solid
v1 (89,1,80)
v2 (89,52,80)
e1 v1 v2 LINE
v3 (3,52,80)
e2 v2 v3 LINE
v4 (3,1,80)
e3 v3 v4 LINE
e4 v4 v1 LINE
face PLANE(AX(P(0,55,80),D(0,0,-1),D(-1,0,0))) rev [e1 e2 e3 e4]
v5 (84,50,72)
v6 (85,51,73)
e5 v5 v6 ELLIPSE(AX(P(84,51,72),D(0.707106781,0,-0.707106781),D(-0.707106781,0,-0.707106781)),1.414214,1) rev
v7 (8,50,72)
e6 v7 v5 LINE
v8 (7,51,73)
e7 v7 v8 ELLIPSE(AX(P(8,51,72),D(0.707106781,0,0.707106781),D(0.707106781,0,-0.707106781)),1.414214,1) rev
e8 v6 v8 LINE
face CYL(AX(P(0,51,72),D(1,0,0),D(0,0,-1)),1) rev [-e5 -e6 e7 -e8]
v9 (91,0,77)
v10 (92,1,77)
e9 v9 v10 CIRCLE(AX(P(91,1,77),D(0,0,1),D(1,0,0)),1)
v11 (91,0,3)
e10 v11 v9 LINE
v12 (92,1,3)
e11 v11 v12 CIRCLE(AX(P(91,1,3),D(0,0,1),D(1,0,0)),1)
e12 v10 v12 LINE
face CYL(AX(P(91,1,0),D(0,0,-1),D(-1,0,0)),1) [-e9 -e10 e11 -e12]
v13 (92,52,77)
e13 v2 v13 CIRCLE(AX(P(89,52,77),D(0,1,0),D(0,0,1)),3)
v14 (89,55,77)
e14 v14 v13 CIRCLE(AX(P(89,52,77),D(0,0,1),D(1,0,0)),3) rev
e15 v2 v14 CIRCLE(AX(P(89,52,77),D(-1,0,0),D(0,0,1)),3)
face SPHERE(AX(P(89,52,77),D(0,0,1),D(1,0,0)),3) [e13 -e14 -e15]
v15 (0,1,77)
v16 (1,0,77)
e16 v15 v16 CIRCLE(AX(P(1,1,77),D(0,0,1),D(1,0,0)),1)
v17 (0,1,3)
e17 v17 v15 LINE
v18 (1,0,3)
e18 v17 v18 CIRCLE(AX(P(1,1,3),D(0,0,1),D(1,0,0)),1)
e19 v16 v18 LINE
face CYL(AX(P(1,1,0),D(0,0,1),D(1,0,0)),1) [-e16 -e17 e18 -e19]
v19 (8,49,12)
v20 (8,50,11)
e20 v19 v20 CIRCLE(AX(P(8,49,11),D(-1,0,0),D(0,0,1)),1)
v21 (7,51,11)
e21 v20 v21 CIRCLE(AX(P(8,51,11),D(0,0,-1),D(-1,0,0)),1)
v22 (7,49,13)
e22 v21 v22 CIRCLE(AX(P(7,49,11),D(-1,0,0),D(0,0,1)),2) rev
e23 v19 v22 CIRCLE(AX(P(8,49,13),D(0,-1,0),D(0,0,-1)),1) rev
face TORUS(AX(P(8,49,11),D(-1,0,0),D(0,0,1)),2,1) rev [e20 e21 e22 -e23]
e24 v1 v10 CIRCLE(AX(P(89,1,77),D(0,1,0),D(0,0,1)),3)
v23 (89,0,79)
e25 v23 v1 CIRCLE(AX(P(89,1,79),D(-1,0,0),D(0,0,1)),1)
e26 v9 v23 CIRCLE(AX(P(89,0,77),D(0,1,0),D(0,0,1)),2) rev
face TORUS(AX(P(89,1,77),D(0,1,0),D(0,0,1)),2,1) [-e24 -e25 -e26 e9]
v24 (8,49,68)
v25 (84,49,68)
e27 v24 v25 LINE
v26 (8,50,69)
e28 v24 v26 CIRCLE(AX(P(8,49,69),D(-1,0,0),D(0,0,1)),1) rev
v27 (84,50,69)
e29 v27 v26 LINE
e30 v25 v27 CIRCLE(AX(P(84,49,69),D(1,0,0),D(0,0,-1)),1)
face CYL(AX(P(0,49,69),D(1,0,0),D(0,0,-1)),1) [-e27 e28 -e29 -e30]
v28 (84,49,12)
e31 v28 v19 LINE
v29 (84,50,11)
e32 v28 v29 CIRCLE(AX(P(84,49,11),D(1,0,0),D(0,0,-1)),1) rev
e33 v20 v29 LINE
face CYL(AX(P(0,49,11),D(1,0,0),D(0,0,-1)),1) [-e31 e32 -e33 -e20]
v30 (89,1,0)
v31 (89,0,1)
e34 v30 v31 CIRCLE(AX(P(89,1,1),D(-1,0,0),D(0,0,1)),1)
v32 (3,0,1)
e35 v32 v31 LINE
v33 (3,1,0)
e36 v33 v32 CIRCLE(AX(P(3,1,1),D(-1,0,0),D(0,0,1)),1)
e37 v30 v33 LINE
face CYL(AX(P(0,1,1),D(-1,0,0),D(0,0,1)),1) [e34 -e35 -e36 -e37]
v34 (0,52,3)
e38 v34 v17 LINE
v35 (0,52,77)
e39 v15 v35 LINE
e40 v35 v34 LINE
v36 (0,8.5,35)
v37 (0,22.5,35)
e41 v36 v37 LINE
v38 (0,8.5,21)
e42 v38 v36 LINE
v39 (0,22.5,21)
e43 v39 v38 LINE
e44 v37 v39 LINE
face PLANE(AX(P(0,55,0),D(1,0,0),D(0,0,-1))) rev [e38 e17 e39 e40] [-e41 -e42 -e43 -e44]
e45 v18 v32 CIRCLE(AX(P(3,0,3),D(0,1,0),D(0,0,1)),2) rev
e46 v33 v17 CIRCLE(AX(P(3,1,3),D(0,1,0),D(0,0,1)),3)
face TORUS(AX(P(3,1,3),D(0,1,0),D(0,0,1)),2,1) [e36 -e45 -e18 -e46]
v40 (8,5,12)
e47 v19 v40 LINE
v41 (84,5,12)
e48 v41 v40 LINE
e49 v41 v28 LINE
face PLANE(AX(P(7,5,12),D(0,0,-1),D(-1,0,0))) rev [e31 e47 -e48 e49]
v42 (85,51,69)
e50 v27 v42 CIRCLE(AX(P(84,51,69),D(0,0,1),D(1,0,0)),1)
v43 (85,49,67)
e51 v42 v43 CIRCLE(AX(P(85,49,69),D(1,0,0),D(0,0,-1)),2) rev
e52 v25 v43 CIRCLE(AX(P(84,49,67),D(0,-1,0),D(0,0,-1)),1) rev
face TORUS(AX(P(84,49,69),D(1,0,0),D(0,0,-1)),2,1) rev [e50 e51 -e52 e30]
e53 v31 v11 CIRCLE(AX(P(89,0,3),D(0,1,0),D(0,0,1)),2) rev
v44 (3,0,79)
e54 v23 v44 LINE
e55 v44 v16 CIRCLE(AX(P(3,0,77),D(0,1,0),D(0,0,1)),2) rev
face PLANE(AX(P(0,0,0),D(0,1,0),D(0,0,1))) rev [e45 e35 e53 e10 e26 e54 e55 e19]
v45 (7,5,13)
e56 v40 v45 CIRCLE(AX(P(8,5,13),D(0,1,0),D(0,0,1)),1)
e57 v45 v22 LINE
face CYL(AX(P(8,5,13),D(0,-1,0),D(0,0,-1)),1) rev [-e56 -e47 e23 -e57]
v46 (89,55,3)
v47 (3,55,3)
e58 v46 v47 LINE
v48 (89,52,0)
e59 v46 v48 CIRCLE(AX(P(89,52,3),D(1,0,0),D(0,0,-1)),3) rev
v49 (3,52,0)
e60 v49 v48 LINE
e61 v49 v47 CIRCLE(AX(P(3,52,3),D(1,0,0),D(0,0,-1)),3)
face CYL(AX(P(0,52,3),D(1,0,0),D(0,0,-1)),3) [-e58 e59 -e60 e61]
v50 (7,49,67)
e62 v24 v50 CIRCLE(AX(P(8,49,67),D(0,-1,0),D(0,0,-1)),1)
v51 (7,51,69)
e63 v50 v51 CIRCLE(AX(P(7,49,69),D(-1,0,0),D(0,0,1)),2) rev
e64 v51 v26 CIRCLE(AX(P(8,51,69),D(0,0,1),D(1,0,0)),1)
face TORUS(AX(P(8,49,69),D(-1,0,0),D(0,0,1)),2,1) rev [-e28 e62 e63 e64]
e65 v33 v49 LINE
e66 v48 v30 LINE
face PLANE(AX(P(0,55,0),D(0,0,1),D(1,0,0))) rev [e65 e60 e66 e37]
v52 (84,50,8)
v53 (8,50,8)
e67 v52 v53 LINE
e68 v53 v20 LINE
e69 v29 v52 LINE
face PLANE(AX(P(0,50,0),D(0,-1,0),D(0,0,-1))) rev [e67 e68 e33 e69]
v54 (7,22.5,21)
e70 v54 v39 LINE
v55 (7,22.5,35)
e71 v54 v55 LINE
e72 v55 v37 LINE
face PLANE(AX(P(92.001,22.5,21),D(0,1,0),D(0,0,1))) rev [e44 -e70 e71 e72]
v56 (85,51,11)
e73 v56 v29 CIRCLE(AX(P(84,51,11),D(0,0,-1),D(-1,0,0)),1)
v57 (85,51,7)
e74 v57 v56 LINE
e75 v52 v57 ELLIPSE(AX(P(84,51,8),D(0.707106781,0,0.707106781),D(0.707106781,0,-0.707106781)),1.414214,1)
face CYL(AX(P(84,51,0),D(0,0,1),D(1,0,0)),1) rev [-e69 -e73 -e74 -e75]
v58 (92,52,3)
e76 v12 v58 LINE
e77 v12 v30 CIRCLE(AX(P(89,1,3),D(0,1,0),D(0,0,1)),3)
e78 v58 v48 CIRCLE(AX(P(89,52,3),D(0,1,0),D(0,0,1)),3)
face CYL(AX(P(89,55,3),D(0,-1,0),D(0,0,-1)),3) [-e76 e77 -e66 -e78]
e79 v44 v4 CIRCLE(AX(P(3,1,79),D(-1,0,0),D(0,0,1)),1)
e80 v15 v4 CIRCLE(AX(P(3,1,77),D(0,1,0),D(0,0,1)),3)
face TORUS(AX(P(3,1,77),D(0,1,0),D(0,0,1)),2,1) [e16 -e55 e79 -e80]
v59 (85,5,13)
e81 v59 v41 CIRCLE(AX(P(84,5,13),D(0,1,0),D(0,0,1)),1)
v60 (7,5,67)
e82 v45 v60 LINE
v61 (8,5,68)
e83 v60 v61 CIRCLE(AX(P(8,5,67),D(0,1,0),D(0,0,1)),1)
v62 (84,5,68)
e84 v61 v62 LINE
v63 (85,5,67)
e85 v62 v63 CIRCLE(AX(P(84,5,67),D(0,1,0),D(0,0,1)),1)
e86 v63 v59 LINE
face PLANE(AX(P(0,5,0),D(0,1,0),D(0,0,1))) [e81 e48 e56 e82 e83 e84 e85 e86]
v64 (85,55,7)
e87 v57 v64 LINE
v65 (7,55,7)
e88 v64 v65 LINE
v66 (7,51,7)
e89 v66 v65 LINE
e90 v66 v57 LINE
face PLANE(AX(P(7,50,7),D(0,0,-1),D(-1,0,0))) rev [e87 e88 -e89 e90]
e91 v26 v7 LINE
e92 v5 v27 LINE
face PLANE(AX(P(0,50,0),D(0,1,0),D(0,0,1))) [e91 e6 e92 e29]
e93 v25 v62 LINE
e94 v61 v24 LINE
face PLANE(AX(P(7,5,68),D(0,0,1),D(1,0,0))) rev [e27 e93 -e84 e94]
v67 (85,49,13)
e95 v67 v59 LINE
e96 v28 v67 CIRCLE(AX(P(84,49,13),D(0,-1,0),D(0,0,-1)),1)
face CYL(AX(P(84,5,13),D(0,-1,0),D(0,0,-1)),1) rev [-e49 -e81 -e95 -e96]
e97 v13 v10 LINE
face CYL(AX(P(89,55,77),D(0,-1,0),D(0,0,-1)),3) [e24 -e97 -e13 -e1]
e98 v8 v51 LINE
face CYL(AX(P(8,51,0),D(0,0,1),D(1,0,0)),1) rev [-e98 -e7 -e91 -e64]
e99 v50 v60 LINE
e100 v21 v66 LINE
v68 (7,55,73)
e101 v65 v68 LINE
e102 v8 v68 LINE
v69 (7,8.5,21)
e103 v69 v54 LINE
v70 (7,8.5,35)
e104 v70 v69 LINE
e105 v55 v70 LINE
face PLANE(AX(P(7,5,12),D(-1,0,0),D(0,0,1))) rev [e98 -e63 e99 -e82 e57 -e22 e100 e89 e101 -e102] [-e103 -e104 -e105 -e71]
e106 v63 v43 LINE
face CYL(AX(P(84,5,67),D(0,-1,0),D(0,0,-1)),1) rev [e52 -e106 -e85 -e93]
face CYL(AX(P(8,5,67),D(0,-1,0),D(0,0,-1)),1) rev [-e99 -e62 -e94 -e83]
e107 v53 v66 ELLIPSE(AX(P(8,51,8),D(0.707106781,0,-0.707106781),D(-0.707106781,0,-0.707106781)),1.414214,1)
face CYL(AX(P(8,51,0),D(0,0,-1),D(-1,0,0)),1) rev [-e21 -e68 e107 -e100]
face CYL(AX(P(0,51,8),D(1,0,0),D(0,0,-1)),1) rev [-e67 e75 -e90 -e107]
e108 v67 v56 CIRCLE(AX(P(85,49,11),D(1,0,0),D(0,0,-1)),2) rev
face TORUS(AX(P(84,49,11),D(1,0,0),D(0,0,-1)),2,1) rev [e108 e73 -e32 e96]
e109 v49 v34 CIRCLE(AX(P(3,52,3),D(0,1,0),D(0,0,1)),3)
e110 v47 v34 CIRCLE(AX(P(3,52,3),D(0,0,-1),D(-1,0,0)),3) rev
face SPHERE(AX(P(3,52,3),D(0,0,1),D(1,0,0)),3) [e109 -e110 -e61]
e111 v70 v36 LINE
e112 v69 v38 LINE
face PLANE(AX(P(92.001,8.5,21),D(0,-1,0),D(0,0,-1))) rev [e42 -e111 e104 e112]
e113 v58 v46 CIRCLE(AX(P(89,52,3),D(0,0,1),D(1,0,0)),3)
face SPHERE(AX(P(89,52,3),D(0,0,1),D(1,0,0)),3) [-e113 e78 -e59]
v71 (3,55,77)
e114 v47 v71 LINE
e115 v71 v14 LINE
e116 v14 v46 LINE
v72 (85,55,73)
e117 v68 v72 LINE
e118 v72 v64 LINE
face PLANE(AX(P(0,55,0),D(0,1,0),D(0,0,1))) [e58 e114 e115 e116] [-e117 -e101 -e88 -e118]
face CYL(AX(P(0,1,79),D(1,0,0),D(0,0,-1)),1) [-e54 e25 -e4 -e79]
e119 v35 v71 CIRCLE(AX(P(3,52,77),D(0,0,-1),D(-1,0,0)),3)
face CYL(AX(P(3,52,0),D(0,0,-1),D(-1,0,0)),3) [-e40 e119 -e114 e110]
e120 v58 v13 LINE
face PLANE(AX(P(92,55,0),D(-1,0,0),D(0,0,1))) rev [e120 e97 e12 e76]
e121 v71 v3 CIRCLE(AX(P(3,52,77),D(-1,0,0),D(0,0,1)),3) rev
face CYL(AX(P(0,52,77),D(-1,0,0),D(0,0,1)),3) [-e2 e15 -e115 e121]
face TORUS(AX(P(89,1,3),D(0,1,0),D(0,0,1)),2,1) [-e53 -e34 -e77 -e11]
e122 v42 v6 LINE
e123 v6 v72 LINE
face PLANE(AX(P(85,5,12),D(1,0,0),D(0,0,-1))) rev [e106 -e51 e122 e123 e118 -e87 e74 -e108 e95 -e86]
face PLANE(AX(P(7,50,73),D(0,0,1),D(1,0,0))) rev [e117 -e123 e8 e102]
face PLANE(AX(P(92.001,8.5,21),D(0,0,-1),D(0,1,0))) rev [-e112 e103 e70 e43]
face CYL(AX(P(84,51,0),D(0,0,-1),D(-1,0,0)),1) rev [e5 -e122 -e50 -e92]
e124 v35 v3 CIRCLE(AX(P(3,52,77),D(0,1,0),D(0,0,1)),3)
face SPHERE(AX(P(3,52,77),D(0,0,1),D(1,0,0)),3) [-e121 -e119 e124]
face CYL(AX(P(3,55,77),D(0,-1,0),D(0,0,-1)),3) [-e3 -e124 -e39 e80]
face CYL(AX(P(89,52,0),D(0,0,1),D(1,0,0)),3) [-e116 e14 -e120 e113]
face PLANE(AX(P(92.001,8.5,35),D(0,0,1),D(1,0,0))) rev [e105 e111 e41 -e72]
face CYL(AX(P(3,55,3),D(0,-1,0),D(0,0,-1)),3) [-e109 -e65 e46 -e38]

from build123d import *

# Parameters (mm, degrees)
SKETCH1_W           = 92
SKETCH1_H           = 80
BOSS_EXTRUDE1_DEPTH = 55
SKETCH2_W           = 78
SKETCH2_H           = 56
CUT_EXTRUDE1_DEPTH  = 50
SKETCH3_W           = 78
SKETCH3_H           = 5
CUT_EXTRUDE2_DEPTH  = 5
FILLET_TOP_R        = 3
FILLET_EDGES_R      = 3
FILLET_BOTTOM_R     = 1
FILLET4_R           = 1
CUT_EXTRUDE4_REACH  = 135.75
SKETCH5_W           = 14
SKETCH5_H           = 14


with BuildPart() as part:
    # Sketch1 → Boss-Extrude1 (new body)
    with BuildSketch(Plane(origin=(0, 0, 0), x_dir=(1, 0, 0), z_dir=(0, 1, 0))):
        with Locations((46, -40)):
            Rectangle(SKETCH1_W, SKETCH1_H)
    extrude(amount=BOSS_EXTRUDE1_DEPTH)

    # Sketch2 → Cut-Extrude1 (cut)
    with BuildSketch(Plane(origin=(0, 55, 0), x_dir=(1, 0, 0), z_dir=(0, 1, 0))):
        with Locations((46, -40)):
            Rectangle(SKETCH2_W, SKETCH2_H)
    extrude(amount=-CUT_EXTRUDE1_DEPTH, mode=Mode.SUBTRACT)

    # Sketch3 → Cut-Extrude2 (cut)
    with BuildSketch(Plane(origin=(0, 55, 0), x_dir=(1, 0, 0), z_dir=(0, 1, 0))):
        with Locations((46, -9.5)):
            Rectangle(SKETCH3_W, SKETCH3_H)
        with Locations((46, -70.5)):
            Rectangle(SKETCH3_W, SKETCH3_H)
    extrude(amount=-CUT_EXTRUDE2_DEPTH, mode=Mode.SUBTRACT)

    # Fillet_top
    fillet_top_edges = [part.edges().sort_by_distance(p)[0] for p in [
        (92, 55, 40),
        (46, 55, 0),
        (0, 55, 40),
        (46, 55, 80),
    ]]
    fillet(fillet_top_edges, radius=FILLET_TOP_R)

    # Fillet_edges
    # the kernel refuses this fillet: 3 mm, written as the material it takes off along each edge
    with BuildSketch(Plane(origin=(3, 52, 77), x_dir=(0, 0, 1), z_dir=(-1, 0, 0))) as fillet_edges_piece_1_section:
        Polygon((0, 0), (FILLET_EDGES_R, 0), (FILLET_EDGES_R, FILLET_EDGES_R), (0, FILLET_EDGES_R), align=None)
    fillet_edges_piece_1 = extrude(amount=FILLET_EDGES_R, mode=Mode.PRIVATE)
    fillet_edges_piece_1 = fillet_edges_piece_1 - Plane(origin=(3, 52, 77), x_dir=(0, -0.7071067811865475, -0.7071067811865475), z_dir=(-1, 0, 0)) * Sphere(FILLET_EDGES_R, mode=Mode.PRIVATE)
    add(fillet_edges_piece_1, mode=Mode.SUBTRACT)
    with BuildSketch(Plane(origin=(3, 52, 3), x_dir=(-1, 0, 0), z_dir=(0, 0, -1))) as fillet_edges_piece_2_section:
        Polygon((0, 0), (FILLET_EDGES_R, 0), (FILLET_EDGES_R, FILLET_EDGES_R), (0, FILLET_EDGES_R), align=None)
    fillet_edges_piece_2 = extrude(amount=FILLET_EDGES_R, mode=Mode.PRIVATE)
    fillet_edges_piece_2 = fillet_edges_piece_2 - Plane(origin=(3, 52, 3), x_dir=(0.7071067811865475, -0.7071067811865475, 0), z_dir=(0, 0, -1)) * Sphere(FILLET_EDGES_R, mode=Mode.PRIVATE)
    add(fillet_edges_piece_2, mode=Mode.SUBTRACT)
    with BuildSketch(Plane(origin=(89, 52, 77), x_dir=(0, 0, 1), z_dir=(1, 0, 0))) as fillet_edges_piece_3_section:
        Polygon((0, 0), (FILLET_EDGES_R, 0), (FILLET_EDGES_R, -FILLET_EDGES_R), (0, -FILLET_EDGES_R), align=None)
    fillet_edges_piece_3 = extrude(amount=FILLET_EDGES_R, mode=Mode.PRIVATE)
    fillet_edges_piece_3 = fillet_edges_piece_3 - Plane(origin=(89, 52, 77), x_dir=(0, -0.7071067811865475, -0.7071067811865475), z_dir=(1, 0, 0)) * Sphere(FILLET_EDGES_R, mode=Mode.PRIVATE)
    add(fillet_edges_piece_3, mode=Mode.SUBTRACT)
    with BuildSketch(Plane(origin=(89, 52, 3), x_dir=(1, 0, 0), z_dir=(0, 0, -1))) as fillet_edges_piece_4_section:
        Polygon((0, 0), (FILLET_EDGES_R, 0), (FILLET_EDGES_R, -FILLET_EDGES_R), (0, -FILLET_EDGES_R), align=None)
    fillet_edges_piece_4 = extrude(amount=FILLET_EDGES_R, mode=Mode.PRIVATE)
    fillet_edges_piece_4 = fillet_edges_piece_4 - Plane(origin=(89, 52, 3), x_dir=(-0.7071067811865475, -0.7071067811865475, 0), z_dir=(0, 0, -1)) * Sphere(FILLET_EDGES_R, mode=Mode.PRIVATE)
    add(fillet_edges_piece_4, mode=Mode.SUBTRACT)
    with BuildSketch(Plane(origin=(92, -7.5, 0), x_dir=(-1, 0, 0), z_dir=(0, 1, 0)), Plane(origin=(92, -7.5, 80), x_dir=(0, 0, -1), z_dir=(0, 1, 0))) as fillet_edges_piece_5:
        with BuildLine():
            CenterArc((FILLET_EDGES_R, FILLET_EDGES_R), FILLET_EDGES_R, 180, 90)
            Line((0, FILLET_EDGES_R), (0, 0))
            Line((0, 0), (FILLET_EDGES_R, 0))
        make_face()
    extrude(amount=59.5, mode=Mode.SUBTRACT)
    with BuildSketch(Plane(origin=(0, -7.5, 80), x_dir=(0, 0, -1), z_dir=(0, 1, 0)), Plane(origin=(0, -7.5, 0), x_dir=(1, 0, 0), z_dir=(0, 1, 0))) as fillet_edges_piece_6:
        with BuildLine():
            CenterArc((FILLET_EDGES_R, -FILLET_EDGES_R), FILLET_EDGES_R, 90, 90)
            Line((0, -FILLET_EDGES_R), (0, 0))
            Line((0, 0), (FILLET_EDGES_R, 0))
        make_face()
    extrude(amount=59.5, mode=Mode.SUBTRACT)

    # Fillet_bottom
    fillet_bottom_edges = [part.edges().sort_by_distance(p)[0] for p in [
        (0, 0, 40),
        (46, 0, 0),
        (92, 0, 40),
        (46, 0, 80),
        (0.878679656, 0, 79.121320344),
        (91.121320344, 0, 79.121320344),
        (91.121320344, 0, 0.878679656),
        (0.878679656, 0, 0.878679656),
    ]]
    fillet(fillet_bottom_edges, radius=FILLET_BOTTOM_R)

    # Fillet4
    fillet4_edges = [part.edges().sort_by_distance(p)[0] for p in [
        (7, 27.5, 68),
        (7, 27.5, 12),
        (85, 27.5, 12),
        (85, 27.5, 68),
        (46, 50, 12),
        (7, 50, 9.5),
        (46, 50, 7),
        (85, 50, 9.5),
        (46, 50, 68),
        (85, 50, 70.5),
        (46, 50, 73),
        (7, 50, 70.5),
    ]]
    fillet(fillet4_edges, radius=FILLET4_R)

    # Sketch5 → Cut-Extrude4 (cut, up to next)
    with BuildSketch(Plane.ZY, mode=Mode.PRIVATE) as cut_extrude4_sk1:
        with Locations((28, 15.5)):
            Rectangle(SKETCH5_W, SKETCH5_H)
    cut_extrude4_tool1 = extrude(cut_extrude4_sk1.sketch, amount=-CUT_EXTRUDE4_REACH, mode=Mode.PRIVATE) & part.part
    add(cut_extrude4_tool1.solids().sort_by_distance((0, 15.5, 28))[0], mode=Mode.SUBTRACT)


solid = part.part
